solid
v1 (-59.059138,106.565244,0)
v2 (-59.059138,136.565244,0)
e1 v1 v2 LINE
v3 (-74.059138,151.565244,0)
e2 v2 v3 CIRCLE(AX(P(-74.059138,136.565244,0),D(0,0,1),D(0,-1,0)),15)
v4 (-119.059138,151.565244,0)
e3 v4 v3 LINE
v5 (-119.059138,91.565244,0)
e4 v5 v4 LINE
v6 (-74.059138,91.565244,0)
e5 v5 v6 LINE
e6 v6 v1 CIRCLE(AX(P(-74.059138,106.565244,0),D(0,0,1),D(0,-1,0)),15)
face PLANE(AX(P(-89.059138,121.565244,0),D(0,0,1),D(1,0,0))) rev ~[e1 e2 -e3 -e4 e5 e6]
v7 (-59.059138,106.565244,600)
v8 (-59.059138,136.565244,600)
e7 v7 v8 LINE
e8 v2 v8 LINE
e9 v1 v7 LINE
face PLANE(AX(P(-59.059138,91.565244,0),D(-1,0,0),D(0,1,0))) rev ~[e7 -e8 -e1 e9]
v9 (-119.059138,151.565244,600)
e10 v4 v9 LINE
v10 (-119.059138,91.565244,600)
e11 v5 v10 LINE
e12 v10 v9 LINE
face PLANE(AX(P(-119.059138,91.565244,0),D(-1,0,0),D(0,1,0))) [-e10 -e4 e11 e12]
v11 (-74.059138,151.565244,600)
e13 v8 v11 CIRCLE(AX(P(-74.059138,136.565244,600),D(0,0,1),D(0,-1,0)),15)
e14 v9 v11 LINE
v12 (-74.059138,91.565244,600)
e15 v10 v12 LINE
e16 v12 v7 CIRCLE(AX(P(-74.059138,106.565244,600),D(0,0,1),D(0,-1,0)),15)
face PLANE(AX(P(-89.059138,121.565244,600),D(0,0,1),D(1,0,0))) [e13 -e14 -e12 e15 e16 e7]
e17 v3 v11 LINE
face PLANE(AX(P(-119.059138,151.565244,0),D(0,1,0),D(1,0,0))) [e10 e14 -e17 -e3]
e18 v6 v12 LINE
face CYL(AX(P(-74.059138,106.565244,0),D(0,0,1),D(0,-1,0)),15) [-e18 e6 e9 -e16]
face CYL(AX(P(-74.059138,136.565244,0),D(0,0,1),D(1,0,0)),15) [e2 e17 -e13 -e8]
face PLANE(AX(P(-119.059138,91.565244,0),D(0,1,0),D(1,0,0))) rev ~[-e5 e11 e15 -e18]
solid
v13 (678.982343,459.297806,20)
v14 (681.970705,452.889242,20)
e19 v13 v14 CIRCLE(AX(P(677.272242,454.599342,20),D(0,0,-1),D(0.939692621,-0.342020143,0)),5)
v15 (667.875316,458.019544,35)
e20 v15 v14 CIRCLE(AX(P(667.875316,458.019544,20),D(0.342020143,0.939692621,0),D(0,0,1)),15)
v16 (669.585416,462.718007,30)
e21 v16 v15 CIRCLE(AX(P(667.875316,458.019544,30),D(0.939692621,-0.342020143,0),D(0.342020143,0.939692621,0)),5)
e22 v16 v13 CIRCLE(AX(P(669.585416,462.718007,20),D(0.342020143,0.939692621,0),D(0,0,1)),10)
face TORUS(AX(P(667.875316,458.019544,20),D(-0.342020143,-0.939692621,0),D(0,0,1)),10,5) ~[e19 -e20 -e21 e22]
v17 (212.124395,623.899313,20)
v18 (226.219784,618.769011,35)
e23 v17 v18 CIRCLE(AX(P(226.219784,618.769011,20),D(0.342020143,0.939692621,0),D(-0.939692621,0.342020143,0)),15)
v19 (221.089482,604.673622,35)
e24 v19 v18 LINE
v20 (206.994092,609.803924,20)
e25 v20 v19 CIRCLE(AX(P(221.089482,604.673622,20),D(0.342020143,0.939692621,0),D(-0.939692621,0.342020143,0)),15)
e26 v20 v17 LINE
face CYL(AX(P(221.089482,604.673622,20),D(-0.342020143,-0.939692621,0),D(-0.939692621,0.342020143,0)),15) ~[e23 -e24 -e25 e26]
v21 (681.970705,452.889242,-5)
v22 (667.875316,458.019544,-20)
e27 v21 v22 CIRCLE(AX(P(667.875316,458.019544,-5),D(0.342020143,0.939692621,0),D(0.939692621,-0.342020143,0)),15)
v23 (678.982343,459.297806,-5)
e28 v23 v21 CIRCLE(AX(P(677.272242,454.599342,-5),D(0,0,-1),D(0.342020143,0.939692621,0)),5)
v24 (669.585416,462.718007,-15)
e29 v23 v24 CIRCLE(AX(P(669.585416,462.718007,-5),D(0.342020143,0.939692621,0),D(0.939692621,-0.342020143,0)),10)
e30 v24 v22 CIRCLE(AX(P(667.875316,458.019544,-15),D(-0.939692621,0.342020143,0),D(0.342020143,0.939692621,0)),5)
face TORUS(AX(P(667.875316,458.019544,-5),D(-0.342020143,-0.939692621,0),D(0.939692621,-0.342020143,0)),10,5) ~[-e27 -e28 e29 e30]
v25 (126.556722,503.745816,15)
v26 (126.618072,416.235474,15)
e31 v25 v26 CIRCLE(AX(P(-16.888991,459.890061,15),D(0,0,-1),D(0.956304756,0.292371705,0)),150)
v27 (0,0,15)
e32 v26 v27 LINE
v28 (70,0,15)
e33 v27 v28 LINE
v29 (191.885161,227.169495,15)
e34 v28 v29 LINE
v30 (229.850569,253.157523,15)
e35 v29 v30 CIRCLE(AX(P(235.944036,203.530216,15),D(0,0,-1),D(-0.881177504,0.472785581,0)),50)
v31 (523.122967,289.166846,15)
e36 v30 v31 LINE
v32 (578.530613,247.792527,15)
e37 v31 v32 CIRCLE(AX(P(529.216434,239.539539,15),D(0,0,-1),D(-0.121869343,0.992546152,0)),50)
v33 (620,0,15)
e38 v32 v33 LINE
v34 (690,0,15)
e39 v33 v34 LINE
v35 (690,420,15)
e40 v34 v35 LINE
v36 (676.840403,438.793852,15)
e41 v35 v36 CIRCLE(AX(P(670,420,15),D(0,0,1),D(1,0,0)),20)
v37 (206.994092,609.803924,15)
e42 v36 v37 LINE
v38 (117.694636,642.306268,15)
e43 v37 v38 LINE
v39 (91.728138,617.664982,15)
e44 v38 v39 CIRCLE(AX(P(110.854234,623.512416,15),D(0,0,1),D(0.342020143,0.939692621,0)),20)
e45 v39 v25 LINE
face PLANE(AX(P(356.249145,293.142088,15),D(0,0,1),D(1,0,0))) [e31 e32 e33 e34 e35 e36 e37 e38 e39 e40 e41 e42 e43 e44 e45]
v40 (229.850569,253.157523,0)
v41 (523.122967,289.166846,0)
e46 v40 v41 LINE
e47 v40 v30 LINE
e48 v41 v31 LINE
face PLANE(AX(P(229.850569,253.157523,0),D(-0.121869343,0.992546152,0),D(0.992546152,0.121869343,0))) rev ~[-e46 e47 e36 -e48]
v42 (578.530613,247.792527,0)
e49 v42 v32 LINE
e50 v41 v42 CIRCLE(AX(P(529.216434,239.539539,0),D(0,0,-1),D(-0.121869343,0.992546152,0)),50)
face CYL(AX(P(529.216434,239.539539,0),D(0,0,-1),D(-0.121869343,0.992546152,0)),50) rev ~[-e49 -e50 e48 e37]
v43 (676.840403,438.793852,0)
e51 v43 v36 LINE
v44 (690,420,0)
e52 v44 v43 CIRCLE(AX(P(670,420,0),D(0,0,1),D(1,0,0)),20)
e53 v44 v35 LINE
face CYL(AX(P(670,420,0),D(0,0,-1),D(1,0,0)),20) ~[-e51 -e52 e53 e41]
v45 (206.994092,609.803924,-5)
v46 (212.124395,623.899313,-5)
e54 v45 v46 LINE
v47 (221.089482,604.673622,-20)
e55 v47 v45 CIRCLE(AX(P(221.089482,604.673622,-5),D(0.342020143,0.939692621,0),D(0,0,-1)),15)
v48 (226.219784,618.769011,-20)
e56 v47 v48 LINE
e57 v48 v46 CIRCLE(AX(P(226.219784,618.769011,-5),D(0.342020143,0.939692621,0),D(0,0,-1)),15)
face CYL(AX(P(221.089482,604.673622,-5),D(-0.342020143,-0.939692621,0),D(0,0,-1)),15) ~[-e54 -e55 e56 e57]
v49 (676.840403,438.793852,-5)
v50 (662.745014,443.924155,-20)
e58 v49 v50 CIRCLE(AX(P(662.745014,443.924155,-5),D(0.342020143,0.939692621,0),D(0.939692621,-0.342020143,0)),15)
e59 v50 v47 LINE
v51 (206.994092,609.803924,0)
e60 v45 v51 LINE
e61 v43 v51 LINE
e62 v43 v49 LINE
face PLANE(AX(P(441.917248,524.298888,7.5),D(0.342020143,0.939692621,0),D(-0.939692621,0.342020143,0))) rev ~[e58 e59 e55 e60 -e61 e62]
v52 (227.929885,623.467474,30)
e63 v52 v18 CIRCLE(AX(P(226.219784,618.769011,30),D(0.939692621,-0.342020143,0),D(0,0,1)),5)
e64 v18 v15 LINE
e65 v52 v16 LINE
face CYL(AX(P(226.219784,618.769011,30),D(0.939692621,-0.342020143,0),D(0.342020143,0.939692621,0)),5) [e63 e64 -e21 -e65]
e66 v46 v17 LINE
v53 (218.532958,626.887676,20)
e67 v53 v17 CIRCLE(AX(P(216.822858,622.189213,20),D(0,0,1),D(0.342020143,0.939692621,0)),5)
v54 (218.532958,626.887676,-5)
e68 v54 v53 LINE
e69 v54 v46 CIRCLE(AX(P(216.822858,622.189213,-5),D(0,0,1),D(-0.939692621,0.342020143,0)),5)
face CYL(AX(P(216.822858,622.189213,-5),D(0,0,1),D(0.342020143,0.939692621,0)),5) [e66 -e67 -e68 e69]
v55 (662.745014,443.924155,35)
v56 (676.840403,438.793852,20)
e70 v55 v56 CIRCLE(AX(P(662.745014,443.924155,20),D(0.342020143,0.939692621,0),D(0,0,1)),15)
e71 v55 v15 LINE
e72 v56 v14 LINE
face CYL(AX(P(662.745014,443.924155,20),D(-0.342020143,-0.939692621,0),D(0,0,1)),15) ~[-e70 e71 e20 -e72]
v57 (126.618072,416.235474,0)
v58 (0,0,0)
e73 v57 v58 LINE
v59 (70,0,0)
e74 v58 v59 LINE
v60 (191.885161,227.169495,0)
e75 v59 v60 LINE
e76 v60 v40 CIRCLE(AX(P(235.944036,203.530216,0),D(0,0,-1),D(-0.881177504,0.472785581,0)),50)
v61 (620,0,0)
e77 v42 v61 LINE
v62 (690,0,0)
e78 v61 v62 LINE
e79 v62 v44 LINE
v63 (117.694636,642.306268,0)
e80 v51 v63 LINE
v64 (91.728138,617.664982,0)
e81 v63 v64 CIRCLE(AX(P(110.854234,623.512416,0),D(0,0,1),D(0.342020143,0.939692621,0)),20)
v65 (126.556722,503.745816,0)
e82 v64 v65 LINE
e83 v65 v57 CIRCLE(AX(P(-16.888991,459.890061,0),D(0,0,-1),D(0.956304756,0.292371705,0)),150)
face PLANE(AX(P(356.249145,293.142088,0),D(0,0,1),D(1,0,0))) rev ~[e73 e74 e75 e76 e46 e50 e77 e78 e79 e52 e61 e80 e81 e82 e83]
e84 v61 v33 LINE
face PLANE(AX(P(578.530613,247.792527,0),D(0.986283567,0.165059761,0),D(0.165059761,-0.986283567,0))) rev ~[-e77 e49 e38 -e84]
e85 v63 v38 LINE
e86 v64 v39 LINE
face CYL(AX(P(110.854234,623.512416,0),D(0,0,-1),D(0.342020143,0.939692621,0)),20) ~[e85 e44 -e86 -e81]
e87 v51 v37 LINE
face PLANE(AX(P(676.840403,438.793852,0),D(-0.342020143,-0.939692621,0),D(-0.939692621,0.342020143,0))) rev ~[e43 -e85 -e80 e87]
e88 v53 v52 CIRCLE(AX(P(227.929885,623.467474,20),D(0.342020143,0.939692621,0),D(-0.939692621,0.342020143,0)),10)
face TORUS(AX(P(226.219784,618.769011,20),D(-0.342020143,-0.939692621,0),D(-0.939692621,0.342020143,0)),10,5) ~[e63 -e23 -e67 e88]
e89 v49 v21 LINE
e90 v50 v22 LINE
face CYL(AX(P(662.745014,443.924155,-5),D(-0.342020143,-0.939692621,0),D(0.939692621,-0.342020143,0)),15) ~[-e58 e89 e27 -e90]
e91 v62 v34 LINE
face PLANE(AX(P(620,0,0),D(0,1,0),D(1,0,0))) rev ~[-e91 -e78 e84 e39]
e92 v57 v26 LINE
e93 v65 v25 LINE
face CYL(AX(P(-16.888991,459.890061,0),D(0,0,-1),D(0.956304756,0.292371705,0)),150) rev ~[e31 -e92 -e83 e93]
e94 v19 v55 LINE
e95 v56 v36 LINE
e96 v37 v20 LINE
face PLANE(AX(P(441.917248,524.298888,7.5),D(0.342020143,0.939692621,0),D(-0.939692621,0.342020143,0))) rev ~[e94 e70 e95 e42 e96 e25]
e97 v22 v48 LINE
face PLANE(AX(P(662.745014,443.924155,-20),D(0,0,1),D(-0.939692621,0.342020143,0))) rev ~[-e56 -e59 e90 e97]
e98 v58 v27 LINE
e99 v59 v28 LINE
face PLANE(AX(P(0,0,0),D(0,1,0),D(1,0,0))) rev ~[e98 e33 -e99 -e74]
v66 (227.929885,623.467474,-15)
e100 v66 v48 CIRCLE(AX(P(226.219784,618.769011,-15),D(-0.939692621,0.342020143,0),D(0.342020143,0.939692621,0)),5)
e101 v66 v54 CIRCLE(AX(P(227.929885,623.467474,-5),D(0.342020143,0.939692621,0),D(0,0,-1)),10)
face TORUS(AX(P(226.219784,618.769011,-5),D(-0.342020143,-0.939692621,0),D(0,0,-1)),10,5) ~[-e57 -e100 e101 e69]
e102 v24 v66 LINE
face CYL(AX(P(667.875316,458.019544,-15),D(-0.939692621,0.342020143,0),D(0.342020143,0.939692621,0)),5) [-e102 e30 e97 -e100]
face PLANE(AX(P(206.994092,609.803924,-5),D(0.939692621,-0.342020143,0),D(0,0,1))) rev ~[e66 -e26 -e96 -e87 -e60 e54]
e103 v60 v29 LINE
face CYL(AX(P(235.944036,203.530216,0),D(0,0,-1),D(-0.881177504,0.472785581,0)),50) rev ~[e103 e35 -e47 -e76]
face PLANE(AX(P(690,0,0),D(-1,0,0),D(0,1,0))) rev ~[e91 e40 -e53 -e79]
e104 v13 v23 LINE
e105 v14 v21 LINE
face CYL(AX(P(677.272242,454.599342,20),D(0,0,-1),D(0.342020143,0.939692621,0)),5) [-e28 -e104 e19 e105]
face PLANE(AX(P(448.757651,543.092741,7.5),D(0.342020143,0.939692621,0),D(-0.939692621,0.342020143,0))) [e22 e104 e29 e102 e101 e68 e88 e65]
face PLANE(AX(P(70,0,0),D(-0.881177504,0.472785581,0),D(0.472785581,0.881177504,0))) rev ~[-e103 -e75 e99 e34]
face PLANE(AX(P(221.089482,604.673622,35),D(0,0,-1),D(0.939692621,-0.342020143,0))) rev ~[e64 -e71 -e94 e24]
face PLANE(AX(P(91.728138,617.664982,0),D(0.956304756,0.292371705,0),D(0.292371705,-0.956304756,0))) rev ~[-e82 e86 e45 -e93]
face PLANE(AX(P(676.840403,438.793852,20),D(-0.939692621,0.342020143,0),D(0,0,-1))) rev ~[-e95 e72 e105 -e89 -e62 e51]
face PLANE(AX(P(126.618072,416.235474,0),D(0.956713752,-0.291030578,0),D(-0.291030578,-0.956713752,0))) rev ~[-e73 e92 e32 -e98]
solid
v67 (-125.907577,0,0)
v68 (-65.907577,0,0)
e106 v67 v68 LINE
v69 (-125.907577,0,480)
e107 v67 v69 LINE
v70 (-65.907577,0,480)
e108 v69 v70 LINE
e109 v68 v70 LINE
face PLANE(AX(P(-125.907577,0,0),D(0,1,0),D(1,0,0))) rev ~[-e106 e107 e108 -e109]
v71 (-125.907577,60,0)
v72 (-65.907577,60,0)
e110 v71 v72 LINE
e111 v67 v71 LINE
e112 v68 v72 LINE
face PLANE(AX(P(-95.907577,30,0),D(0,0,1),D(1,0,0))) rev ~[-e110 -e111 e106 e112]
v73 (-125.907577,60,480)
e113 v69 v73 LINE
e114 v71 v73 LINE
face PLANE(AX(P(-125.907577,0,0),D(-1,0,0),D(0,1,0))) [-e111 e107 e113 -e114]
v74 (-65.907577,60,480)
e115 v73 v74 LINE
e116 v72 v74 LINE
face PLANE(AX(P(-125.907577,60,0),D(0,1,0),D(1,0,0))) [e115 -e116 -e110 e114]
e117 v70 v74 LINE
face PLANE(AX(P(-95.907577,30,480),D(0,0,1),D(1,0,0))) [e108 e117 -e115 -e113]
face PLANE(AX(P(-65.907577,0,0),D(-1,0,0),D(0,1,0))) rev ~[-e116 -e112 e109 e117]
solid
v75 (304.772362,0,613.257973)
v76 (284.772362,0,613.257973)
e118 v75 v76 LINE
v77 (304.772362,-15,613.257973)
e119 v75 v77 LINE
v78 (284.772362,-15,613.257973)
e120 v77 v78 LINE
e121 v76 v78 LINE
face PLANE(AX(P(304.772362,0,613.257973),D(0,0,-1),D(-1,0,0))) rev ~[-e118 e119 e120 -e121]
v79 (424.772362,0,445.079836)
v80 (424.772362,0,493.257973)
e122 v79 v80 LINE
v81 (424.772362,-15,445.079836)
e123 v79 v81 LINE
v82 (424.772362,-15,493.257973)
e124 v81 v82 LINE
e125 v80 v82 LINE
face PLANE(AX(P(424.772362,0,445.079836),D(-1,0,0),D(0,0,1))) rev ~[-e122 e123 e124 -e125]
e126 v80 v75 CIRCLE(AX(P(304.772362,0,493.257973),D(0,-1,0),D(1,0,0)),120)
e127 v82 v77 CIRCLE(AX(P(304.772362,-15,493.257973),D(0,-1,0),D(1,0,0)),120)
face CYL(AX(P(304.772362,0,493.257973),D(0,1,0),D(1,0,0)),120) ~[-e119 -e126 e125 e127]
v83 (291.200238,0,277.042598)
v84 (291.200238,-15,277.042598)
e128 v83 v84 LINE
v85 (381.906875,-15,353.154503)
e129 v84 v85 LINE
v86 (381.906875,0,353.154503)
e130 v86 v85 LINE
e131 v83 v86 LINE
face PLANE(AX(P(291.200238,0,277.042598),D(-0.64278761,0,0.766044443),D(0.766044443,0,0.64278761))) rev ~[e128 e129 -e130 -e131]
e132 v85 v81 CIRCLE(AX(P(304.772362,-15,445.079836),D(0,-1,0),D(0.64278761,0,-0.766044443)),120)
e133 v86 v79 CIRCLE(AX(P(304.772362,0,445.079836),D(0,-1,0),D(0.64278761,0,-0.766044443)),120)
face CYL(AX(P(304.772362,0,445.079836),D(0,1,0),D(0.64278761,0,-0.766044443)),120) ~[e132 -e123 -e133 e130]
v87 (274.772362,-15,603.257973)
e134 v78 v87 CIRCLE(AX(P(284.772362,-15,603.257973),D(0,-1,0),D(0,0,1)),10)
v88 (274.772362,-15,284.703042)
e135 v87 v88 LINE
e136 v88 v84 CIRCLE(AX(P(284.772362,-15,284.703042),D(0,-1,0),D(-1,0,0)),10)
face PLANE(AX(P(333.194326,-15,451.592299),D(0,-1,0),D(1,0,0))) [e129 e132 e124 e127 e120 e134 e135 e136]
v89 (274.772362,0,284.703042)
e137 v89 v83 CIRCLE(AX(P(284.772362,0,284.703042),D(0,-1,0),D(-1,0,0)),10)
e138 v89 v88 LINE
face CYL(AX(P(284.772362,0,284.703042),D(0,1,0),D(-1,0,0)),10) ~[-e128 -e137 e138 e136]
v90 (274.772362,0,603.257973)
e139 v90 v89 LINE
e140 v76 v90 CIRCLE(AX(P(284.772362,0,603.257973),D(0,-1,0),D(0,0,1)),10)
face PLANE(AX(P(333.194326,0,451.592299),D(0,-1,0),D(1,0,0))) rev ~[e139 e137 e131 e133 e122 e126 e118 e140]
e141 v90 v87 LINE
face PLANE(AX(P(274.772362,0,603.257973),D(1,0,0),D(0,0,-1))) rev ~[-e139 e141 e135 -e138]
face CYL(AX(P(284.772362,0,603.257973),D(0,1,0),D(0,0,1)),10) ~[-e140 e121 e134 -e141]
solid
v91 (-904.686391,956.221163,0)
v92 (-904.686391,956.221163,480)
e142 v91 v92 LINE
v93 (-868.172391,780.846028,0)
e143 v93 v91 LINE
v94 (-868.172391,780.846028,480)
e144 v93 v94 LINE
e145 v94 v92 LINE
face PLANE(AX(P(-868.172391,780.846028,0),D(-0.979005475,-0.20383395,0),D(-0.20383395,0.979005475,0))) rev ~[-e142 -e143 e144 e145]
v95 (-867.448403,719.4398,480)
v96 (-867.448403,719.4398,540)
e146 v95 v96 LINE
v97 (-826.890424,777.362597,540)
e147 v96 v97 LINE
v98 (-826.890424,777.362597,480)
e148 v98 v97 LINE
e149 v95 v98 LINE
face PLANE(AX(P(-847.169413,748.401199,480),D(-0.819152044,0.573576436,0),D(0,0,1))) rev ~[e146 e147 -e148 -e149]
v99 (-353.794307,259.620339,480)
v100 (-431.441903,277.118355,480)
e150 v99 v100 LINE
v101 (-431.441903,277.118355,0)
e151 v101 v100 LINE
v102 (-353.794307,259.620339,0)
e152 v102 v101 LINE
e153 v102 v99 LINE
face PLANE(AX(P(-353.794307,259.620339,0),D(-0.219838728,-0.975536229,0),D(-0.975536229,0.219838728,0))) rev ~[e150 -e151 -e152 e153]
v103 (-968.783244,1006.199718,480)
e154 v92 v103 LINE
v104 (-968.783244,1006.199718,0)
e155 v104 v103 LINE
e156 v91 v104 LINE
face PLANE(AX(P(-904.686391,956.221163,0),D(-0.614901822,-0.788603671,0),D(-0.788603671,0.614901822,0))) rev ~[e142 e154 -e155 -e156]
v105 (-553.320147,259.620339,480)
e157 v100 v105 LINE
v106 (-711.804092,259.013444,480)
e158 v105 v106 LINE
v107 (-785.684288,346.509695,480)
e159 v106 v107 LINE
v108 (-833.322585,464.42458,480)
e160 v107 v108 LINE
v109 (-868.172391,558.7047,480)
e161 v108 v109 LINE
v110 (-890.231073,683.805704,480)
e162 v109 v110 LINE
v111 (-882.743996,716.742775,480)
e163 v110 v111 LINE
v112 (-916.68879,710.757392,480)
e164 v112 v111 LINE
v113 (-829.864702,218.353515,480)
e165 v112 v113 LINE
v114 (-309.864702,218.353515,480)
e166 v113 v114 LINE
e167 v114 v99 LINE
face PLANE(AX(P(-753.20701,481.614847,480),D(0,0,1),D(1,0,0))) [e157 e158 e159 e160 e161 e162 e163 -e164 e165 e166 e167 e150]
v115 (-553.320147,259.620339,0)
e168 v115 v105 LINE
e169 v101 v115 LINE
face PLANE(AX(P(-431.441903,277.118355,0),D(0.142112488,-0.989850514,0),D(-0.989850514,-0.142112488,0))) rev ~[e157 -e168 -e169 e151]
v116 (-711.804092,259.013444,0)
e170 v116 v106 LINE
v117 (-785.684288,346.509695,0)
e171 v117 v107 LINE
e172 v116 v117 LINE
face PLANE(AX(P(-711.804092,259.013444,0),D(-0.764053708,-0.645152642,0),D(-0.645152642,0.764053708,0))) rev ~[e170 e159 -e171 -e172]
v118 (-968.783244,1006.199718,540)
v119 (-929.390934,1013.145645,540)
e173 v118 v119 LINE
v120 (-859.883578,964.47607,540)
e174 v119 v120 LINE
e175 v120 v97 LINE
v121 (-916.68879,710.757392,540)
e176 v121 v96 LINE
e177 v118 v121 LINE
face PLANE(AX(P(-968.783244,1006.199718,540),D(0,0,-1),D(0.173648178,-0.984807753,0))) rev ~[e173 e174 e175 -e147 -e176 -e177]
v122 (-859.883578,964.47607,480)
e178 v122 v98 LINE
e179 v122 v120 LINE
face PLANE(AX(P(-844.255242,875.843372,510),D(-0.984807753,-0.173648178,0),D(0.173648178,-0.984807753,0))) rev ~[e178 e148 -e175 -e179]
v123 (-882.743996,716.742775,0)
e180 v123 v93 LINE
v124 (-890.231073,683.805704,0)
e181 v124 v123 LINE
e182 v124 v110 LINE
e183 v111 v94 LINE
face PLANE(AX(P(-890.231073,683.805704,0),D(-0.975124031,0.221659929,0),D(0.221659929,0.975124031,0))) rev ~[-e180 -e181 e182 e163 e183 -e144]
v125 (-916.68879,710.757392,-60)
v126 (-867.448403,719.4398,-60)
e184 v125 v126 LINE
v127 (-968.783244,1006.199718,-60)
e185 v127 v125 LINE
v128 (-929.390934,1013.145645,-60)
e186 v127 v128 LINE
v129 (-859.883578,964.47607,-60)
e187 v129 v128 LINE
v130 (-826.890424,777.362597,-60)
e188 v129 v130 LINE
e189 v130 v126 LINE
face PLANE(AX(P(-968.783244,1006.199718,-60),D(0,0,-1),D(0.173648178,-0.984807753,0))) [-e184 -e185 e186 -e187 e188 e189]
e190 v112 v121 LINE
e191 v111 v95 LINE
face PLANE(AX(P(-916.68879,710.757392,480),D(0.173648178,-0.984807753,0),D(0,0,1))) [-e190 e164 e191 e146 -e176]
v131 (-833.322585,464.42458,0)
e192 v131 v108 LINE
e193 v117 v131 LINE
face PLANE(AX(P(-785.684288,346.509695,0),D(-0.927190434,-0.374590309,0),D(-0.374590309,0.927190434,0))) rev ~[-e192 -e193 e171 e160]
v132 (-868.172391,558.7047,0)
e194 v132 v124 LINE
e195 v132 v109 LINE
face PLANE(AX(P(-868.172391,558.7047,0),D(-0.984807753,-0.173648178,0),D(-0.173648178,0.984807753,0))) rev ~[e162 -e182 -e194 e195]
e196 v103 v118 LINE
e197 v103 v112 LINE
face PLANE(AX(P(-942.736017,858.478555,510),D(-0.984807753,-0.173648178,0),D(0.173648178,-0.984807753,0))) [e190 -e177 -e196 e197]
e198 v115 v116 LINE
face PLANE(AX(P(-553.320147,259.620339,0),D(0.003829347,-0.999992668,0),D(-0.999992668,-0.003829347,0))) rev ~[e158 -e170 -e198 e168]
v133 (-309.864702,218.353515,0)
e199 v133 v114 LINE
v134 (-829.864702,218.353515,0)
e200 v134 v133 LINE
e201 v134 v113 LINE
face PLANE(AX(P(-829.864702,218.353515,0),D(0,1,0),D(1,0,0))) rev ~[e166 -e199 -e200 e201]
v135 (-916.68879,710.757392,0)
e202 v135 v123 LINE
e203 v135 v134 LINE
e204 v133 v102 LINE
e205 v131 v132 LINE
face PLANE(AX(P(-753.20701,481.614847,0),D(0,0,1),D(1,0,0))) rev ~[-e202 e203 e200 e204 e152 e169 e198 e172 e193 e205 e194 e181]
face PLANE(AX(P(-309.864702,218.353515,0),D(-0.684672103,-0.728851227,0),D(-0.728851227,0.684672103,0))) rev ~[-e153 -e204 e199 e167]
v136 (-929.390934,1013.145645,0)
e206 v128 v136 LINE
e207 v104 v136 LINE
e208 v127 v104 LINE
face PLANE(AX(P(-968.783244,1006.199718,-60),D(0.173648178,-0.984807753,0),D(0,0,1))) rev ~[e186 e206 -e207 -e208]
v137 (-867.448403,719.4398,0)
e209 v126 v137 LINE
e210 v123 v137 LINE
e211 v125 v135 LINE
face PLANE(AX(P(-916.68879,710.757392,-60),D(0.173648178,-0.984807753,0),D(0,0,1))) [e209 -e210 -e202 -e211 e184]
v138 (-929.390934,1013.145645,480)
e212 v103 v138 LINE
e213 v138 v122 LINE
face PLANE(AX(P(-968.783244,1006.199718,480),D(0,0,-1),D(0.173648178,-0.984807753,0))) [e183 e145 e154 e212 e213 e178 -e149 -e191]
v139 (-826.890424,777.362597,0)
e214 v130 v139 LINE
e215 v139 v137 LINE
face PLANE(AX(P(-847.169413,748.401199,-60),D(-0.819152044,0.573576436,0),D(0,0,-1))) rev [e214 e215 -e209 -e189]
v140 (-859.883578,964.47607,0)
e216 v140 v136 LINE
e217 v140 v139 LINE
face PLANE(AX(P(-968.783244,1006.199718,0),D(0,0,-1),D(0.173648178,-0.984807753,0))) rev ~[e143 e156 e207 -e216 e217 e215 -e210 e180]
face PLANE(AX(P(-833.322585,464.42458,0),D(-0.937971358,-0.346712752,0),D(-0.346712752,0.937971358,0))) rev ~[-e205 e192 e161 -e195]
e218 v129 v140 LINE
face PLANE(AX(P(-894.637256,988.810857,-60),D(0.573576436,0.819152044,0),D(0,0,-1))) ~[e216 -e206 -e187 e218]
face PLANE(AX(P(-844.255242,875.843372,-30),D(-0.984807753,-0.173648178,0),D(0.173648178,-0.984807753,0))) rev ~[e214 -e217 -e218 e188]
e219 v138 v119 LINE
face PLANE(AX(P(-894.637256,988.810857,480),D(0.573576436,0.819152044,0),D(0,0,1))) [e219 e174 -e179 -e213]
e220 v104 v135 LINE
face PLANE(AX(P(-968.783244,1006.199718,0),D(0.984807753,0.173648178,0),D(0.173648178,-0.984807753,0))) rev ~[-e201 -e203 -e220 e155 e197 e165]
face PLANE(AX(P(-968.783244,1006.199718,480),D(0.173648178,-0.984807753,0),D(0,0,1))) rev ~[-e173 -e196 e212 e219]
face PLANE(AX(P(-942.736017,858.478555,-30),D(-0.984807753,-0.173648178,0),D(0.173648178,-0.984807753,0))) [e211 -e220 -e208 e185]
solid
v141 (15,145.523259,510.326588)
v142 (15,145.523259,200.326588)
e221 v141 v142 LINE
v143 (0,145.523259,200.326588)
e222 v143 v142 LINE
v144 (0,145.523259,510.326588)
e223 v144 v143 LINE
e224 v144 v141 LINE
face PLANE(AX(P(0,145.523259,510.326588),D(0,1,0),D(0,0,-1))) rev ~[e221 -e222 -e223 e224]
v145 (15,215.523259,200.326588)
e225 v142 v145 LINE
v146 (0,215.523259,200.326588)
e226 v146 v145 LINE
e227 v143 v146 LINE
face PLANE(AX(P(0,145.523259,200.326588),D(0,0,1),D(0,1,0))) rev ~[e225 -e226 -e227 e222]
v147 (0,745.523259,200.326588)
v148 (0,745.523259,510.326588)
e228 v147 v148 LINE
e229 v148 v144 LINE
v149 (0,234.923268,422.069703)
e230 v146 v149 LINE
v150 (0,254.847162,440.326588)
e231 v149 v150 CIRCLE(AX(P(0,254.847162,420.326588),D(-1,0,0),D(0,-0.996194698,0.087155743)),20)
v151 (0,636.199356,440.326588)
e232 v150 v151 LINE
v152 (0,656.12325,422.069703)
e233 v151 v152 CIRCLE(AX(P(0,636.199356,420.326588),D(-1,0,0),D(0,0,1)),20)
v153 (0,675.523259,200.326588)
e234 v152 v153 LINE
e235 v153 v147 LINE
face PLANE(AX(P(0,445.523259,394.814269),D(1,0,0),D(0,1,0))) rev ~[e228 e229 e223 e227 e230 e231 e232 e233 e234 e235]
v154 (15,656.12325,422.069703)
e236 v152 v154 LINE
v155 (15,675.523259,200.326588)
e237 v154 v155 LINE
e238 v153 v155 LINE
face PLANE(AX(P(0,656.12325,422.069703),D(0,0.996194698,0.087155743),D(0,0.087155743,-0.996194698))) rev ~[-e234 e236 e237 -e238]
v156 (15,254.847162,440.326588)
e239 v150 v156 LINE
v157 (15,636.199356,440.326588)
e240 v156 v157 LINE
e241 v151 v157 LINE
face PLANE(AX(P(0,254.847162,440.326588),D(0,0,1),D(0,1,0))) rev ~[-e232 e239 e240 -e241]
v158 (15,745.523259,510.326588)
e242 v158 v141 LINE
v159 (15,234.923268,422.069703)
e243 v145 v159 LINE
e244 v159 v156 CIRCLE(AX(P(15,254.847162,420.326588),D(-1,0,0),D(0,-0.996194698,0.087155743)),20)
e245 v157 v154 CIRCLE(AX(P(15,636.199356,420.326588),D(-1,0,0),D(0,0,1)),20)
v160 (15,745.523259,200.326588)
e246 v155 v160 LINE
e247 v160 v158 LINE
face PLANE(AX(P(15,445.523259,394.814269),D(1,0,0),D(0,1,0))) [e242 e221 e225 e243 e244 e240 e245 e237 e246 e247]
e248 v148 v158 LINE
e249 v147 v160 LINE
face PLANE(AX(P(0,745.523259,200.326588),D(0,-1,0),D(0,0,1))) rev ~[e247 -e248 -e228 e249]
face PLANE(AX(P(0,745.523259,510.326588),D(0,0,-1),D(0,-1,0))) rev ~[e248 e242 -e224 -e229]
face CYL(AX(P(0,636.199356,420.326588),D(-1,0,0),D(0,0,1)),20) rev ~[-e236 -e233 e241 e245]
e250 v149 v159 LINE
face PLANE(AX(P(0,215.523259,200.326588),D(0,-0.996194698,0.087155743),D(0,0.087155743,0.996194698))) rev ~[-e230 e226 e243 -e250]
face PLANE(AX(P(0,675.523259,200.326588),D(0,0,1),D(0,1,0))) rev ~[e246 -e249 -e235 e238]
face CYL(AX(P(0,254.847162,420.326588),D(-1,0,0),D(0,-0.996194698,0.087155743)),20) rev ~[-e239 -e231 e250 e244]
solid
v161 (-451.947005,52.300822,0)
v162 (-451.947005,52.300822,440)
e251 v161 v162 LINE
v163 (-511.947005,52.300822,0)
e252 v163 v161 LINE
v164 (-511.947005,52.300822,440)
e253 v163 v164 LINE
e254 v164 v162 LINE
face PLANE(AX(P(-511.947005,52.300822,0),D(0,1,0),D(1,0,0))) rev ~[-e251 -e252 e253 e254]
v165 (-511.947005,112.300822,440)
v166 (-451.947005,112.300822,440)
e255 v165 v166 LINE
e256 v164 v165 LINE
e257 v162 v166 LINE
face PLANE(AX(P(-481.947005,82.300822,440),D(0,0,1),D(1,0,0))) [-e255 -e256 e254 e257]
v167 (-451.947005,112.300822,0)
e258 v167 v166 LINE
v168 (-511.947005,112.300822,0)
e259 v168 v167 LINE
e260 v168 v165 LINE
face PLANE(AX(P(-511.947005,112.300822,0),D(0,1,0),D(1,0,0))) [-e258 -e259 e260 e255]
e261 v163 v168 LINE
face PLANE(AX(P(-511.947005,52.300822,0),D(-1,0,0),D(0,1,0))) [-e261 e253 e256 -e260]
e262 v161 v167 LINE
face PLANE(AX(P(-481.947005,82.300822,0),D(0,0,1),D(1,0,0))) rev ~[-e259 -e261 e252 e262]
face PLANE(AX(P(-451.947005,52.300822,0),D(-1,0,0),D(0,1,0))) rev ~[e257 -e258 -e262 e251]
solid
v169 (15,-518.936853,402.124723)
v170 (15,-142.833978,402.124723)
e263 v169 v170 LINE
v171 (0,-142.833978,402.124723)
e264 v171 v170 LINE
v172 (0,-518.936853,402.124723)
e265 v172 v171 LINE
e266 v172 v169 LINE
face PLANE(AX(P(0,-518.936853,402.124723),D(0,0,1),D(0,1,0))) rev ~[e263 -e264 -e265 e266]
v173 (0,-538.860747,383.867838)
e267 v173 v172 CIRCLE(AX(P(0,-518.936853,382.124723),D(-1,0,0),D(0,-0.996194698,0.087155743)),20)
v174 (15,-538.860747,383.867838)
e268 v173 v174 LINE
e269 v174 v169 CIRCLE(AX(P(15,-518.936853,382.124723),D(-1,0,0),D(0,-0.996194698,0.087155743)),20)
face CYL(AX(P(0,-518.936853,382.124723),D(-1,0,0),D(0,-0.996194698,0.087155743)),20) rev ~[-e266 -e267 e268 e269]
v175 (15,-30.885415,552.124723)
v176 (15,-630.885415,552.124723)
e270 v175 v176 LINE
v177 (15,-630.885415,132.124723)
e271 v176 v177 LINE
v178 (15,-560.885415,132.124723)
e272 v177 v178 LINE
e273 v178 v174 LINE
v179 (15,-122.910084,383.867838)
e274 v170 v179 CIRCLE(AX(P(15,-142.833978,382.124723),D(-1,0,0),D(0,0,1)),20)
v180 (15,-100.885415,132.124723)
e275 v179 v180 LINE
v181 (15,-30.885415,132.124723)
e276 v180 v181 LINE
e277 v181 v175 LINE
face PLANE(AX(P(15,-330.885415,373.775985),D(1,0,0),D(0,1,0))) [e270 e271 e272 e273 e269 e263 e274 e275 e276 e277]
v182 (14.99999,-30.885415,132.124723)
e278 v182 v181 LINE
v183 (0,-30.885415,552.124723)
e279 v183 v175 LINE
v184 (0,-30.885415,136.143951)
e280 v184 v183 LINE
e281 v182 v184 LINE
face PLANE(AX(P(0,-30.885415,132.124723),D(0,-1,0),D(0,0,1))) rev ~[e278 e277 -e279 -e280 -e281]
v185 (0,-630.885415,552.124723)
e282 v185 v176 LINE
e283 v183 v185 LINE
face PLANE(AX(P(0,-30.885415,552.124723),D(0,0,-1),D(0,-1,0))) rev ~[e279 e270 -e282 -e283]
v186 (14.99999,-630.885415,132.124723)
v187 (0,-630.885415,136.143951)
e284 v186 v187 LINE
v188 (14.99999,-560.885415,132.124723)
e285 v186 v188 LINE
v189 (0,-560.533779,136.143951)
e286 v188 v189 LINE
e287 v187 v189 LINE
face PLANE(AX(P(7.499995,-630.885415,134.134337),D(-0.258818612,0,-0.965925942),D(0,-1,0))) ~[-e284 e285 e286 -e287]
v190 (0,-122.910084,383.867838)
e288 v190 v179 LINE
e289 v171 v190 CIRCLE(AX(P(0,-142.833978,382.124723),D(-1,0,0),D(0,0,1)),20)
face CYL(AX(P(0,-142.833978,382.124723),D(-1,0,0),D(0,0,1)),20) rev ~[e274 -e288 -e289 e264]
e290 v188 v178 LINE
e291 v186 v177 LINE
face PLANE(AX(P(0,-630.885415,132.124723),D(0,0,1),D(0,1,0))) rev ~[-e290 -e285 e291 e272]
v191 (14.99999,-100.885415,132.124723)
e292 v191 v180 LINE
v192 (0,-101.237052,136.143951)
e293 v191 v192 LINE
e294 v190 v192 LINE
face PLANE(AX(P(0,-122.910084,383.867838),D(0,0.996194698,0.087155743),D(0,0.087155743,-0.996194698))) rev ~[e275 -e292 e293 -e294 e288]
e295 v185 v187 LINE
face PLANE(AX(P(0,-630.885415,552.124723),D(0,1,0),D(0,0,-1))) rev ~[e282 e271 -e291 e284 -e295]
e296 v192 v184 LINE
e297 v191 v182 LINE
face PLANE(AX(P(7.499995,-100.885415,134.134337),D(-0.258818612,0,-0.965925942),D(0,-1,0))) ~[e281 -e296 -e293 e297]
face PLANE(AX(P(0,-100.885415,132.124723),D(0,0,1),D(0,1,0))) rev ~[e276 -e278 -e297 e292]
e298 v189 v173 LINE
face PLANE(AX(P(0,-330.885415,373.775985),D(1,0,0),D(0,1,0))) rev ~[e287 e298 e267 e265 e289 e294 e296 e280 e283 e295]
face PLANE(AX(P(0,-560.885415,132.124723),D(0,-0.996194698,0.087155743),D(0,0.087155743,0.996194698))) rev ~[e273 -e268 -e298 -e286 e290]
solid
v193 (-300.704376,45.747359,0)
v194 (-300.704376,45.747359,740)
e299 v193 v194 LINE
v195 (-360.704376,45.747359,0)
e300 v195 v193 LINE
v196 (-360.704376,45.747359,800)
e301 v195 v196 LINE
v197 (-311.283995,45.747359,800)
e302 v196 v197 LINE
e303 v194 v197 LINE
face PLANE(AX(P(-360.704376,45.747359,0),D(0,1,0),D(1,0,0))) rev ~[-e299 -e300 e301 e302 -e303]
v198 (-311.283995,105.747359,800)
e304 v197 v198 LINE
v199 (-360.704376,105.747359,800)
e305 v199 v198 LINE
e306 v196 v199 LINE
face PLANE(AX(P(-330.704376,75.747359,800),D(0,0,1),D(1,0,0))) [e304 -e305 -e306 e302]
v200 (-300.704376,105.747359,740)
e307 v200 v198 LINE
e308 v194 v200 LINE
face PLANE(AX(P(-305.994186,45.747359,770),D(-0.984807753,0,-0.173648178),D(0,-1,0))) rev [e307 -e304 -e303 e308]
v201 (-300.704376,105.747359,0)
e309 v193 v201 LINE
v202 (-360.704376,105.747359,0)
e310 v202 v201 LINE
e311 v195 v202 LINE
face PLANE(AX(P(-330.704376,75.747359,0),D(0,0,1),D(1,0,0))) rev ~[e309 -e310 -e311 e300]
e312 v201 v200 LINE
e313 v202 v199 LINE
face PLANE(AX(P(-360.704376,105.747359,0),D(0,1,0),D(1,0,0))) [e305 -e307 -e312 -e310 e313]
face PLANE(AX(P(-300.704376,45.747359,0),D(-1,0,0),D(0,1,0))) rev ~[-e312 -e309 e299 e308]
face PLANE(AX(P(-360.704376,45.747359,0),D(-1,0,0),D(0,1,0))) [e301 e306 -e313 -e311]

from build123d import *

# Parameters (mm, degrees)
F1_DEPTH    = 15
F3_DEPTH    = 20
F4_R        = 5
F6_DEPTH    = 600
F7_R        = 50
F9_DEPTH    = 300
F10_R       = 10
F12_DEPTH   = 15
F13_SIZE2   = 4.019228
F13_SIZE    = 14.99999
F13_2_SIZE2 = 4.019228
F13_2_SIZE  = 14.99999
F15_W       = 60
F15_H       = 60
F16_DEPTH   = 440
F17_W       = 60
F17_H       = 60
F18_DEPTH   = 800
F19_SIZE2   = 10.5796188425
F19_SIZE    = 60
F20_W       = 60
F20_H       = 60
F21_DEPTH   = 600
F23_DEPTH   = 15
F24_R       = 15
F25_W       = 60
F25_H       = 60
F26_DEPTH   = 480
F28_DEPTH   = 480
F29_W       = 300
F29_H       = 60
F30_DEPTH   = 100
F31_SIZE    = 50
F32_SIZE    = 60


# Not quite as in the source:
# - a fillet or chamfer is up to 0.001 mm smaller than in the source, because OpenCascade refuses the exact size


with BuildPart() as f1:
    # F0 (on Top) → F1 (new body)
    with BuildSketch(Plane.XY):
        with BuildLine():
            Line((126.6180717201, 416.2354741443), (0, 0))
            Line((0, 0), (70, 0))
            Line((70, 0), (191.8851607508, 227.1694949665))
            ThreePointArc((191.8851607508, 227.1694949665), (207.7011825649, 244.7896539907), (229.8505687934, 253.1575234781))
            Line((229.8505687934, 253.1575234781), (523.1229672837, 289.1668461516))
            ThreePointArc((523.1229672837, 289.1668461516), (559.1324176201, 279.6024135438), (578.5306128266, 247.7925266))
            Line((578.5306128266, 247.7925266), (620, 0))
            Line((620, 0), (690, 0))
            Line((690, 0), (690, 420))
            ThreePointArc((690, 420), (686.3830408858, 431.471528727), (676.8404028665, 438.7938524157))
            Line((676.8404028665, 438.7938524157), (117.6946363687, 642.3062680369))
            ThreePointArc((117.6946363687, 642.3062680369), (97.0871419884, 638.0199030414), (91.728138383, 617.6649815267))
            Line((91.728138383, 617.6649815267), (126.5567223416, 503.7458164876))
            ThreePointArc((126.5567223416, 503.7458164876), (133.1109720865, 459.9952186871), (126.6180717201, 416.2354741443))
        make_face()
    extrude(amount=F1_DEPTH)

    # F2 (on face) → F3 (join)
    with BuildSketch(Plane(origin=(220.2009124558, 604.9970347157, 0), x_dir=(-0.9396926208, 0.3420201433, 0), z_dir=(0.3420201433, 0.9396926208, 0))):
        with BuildLine():
            Line((-0.9455957298, 35), (-470.9455957298, 35))
            ThreePointArc((-470.9455957298, 35), (-481.5521974476, 30.6066017178), (-485.9455957298, 20))
            Line((-485.9455957298, 20), (-485.9455957298, -5))
            ThreePointArc((-485.9455957298, -5), (-481.5521974476, -15.6066017178), (-470.9455957298, -20))
            Line((-470.9455957298, -20), (-0.9455957298, -20))
            ThreePointArc((-0.9455957298, -20), (9.661005988, -15.6066017178), (14.0544042702, -5))
            Line((14.0544042702, -5), (14.0544042702, 20))
            ThreePointArc((14.0544042702, 20), (9.661005988, 30.6066017178), (-0.9455957298, 35))
        make_face()
    extrude(amount=F3_DEPTH)

    # F4
    f4_edges = [f1.edges().sort_by_distance(p)[0] for p in [
        (448.757651, 543.092741, -20),
    ]]
    fillet(f4_edges, radius=F4_R)


with BuildPart() as f6:
    # F5 (on Front) → F6 (new body)
    with BuildSketch(Plane.XZ):
        with BuildLine():
            Line((-123.4288864959, -313.8082504272), (0, -1013.8082504272))
            Line((0, -1013.8082504272), (626.6764420045, -1013.8082504272))
            ThreePointArc((626.6764420045, -1013.8082504272), (645.8275530824, -1004.8779406694), (651.2966358298, -984.4670459856))
            Line((651.2966358298, -984.4670459856), (640.3123613054, -922.1721295738))
            ThreePointArc((640.3123613054, -922.1721295738), (604.7540774342, -861.8146206111), (538.3170815047, -839.5987251324))
            Line((538.3170815047, -839.5987251324), (134.2559409884, -853.8082504272))
            Line((134.2559409884, -853.8082504272), (39.0393714058, -313.8082504272))
            Line((39.0393714058, -313.8082504272), (39.0393714058, -13.8082504272))
            Line((39.0393714058, -13.8082504272), (-123.4288864959, -13.8082504272))
            Line((-123.4288864959, -13.8082504272), (-123.4288864959, -313.8082504272))
        make_face()
    extrude(amount=F6_DEPTH)

    # F7
    f7_edges = [f6.edges().sort_by_distance(p)[0] for p in [
        (0, -300, -1013.80825),
    ]]
    fillet(f7_edges, radius=F7_R)

    # F8 (on face) → F9 (join)
    with BuildSketch(Plane.XY.offset(-13.8082504272)):
        Polygon((-123.4288864959, 0), (39.0393714058, 0), (175.9928613901, 89.3815875053), (66.5727051852, 89.3815875053), align=None)
        Polygon((175.9928613901, -689.3815875053), (39.0393714058, -600), (-123.4288864959, -600), (66.5727051852, -689.3815875053), align=None)
    extrude(amount=-F9_DEPTH)

    # F10 (call 1 of 8: OpenCascade refuses the feature's edges together)
    f10_edges = [f6.edges().sort_by_distance(p)[0] for p in [
        (175.992861, -689.381588, -163.80825),
    ]]
    fillet(f10_edges, radius=F10_R)

    # F10#2 (call 2 of 8)
    f10_2_edges = [f6.edges().sort_by_distance(p)[0] for p in [
        (175.992861, 89.381588, -163.80825),
    ]]
    fillet(f10_2_edges, radius=F10_R)

    # F10#3 (call 3 of 8)
    f10_3_edges = [f6.edges().sort_by_distance(p)[0] for p in [
        (66.572705, -689.381588, -163.80825),
    ]]
    fillet(f10_3_edges, radius=F10_R)

    # F10#4 (call 4 of 8)
    f10_4_edges = [f6.edges().sort_by_distance(p)[0] for p in [
        (-123.428886, -600, -163.80825),
    ]]
    fillet(f10_4_edges, radius=F10_R)

    # F10#5 (call 5 of 8)
    f10_5_edges = [f6.edges().sort_by_distance(p)[0] for p in [
        (66.572705, 89.381588, -163.80825),
    ]]
    fillet(f10_5_edges, radius=F10_R)

    # F10#6 (call 6 of 8)
    f10_6_edges = [f6.edges().sort_by_distance(p)[0] for p in [
        (-123.428886, 0, -163.80825),
    ]]
    fillet(f10_6_edges, radius=F10_R)

    # F10#7 (call 7 of 8)
    f10_7_edges = [f6.edges().sort_by_distance(p)[0] for p in [
        (39.039371, -600, -163.80825),
    ]]
    fillet(f10_7_edges, radius=F10_R)

    # F10#8 (call 8 of 8)
    f10_8_edges = [f6.edges().sort_by_distance(p)[0] for p in [
        (39.039371, 0, -163.80825),
    ]]
    fillet(f10_8_edges, radius=F10_R)


with BuildPart() as f12:
    # F11 (on Right) → F12 (new body)
    with BuildSketch(Plane.YZ):
        with BuildLine():
            Line((-30.8854154888, 552.1247227984), (-630.8854154888, 552.1247227984))
            Line((-630.8854154888, 552.1247227984), (-630.8854154888, 132.1247227984))
            Line((-630.8854154888, 132.1247227984), (-560.8854154888, 132.1247227984))
            Line((-560.8854154888, 132.1247227984), (-538.8607468183, 383.8678376533))
            ThreePointArc((-538.8607468183, 383.8678376533), (-532.4486570087, 396.8702695346), (-518.9368528564, 402.1247227984))
            Line((-518.9368528564, 402.1247227984), (-142.8339781211, 402.1247227984))
            ThreePointArc((-142.8339781211, 402.1247227984), (-129.3221739688, 396.8702695346), (-122.9100841593, 383.8678376533))
            Line((-122.9100841593, 383.8678376533), (-100.8854154888, 132.1247227984))
            Line((-100.8854154888, 132.1247227984), (-30.8854154888, 132.1247227984))
            Line((-30.8854154888, 132.1247227984), (-30.8854154888, 552.1247227984))
        make_face()
    extrude(amount=F12_DEPTH)

    # F13 (size 15 and 4.0192378865 in the source; OpenCascade refuses exactly that, so slightly less here)
    f13_edges = [f12.edges().sort_by_distance(p)[0] for p in [
        (0, -595.885415, 132.124723),
    ]]
    f13_side = f12.faces().sort_by_distance((7.5, -595.885415, 132.124723))[0]
    chamfer(f13_edges, length=F13_SIZE, length2=F13_SIZE2, reference=f13_side)

    # F13#2 (size 15 and 4.0192378865 in the source; OpenCascade refuses exactly that, so slightly less here)
    f13_2_edges = [f12.edges().sort_by_distance(p)[0] for p in [
        (0, -65.885415, 132.124723),
    ]]
    f13_2_side = f12.faces().sort_by_distance((7.5, -65.885415, 132.124723))[0]
    chamfer(f13_2_edges, length=F13_2_SIZE, length2=F13_2_SIZE2, reference=f13_2_side)


with BuildPart() as f12b:
    # F11 (on Right) → F12, piece 2 (new body)
    with BuildSketch(Plane.YZ):
        with BuildLine():
            Line((745.5232589184, 510.3265881046), (145.5232589184, 510.3265881046))
            Line((145.5232589184, 510.3265881046), (145.5232589184, 200.3265881046))
            Line((145.5232589184, 200.3265881046), (215.5232589184, 200.3265881046))
            Line((215.5232589184, 200.3265881046), (234.9232676831, 422.0697029596))
            ThreePointArc((234.9232676831, 422.0697029596), (241.3353574927, 435.0721348408), (254.847161645, 440.3265881046))
            Line((254.847161645, 440.3265881046), (636.1993561918, 440.3265881046))
            ThreePointArc((636.1993561918, 440.3265881046), (649.7111603441, 435.0721348408), (656.1232501537, 422.0697029596))
            Line((656.1232501537, 422.0697029596), (675.5232589184, 200.3265881046))
            Line((675.5232589184, 200.3265881046), (745.5232589184, 200.3265881046))
            Line((745.5232589184, 200.3265881046), (745.5232589184, 510.3265881046))
        make_face()
    extrude(amount=F12_DEPTH)


with BuildPart() as f16:
    # F15 (on Top) → F16 (new body)
    with BuildSketch(Plane.XY):
        with Locations((-481.9470045646, 82.3008220813)):
            Rectangle(F15_W, F15_H)
    extrude(amount=F16_DEPTH)


with BuildPart() as f18:
    # F17 (on Top) → F18 (new body)
    with BuildSketch(Plane.XY):
        with Locations((-330.7043761015, 75.7473593429)):
            Rectangle(F17_W, F17_H)
    extrude(amount=F18_DEPTH)

    # F19
    f19_edges = [f18.edges().sort_by_distance(p)[0] for p in [
        (-300.704376, 75.747359, 800),
    ]]
    f19_side = f18.faces().sort_by_distance((-300.704376, 75.747359, 400))[0]
    chamfer(f19_edges, length=F19_SIZE, length2=F19_SIZE2, reference=f19_side)


with BuildPart() as f21:
    # F20 (on Top) → F21 (new body)
    with BuildSketch(Plane.XY):
        with Locations((-89.059138, 121.5652438998)):
            Rectangle(F20_W, F20_H)
    extrude(amount=F21_DEPTH)

    # F24
    f24_edges = [f21.edges().sort_by_distance(p)[0] for p in [
        (-59.059138, 151.565244, 300),
        (-59.059138, 91.565244, 300),
    ]]
    fillet(f24_edges, radius=F24_R)


with BuildPart() as f23:
    # F22 (on Front) → F23 (new body)
    with BuildSketch(Plane.XZ):
        with BuildLine():
            Line((304.7723621194, 613.257972736), (284.7723621194, 613.257972736))
            ThreePointArc((284.7723621194, 613.257972736), (277.7012943075, 610.3290405479), (274.7723621194, 603.257972736))
            Line((274.7723621194, 603.257972736), (274.7723621194, 284.7030419411))
            ThreePointArc((274.7723621194, 284.7030419411), (280.546179502, 275.6399640708), (291.2002382162, 277.0425975099))
            Line((291.2002382162, 277.0425975099), (381.9068752817, 353.154503217))
            ThreePointArc((381.9068752817, 353.154503217), (413.5292965638, 394.3656449823), (424.7723621194, 445.0798363912))
            Line((424.7723621194, 445.0798363912), (424.7723621194, 493.257972736))
            ThreePointArc((424.7723621194, 493.257972736), (389.6251758617, 578.1107864784), (304.7723621194, 613.257972736))
        make_face()
    extrude(amount=F23_DEPTH)


with BuildPart() as f26:
    # F25 (on Top) → F26 (new body)
    with BuildSketch(Plane.XY):
        with Locations((-95.9075767291, 30)):
            Rectangle(F25_W, F25_H)
    extrude(amount=F26_DEPTH)


with BuildPart() as f28:
    # F27 (on Top) → F28 (new body)
    with BuildSketch(Plane.XY):
        Polygon((-829.8647016287, 218.3535151119), (-309.8647016287, 218.3535151119), (-353.7943065166, 259.6203386784), (-431.4419031143, 277.1183550358), (-553.3201474993, 259.6203386784), (-711.8040919304, 259.0134441853), (-785.6842875481, 346.5096950531), (-833.3225846291, 464.4245803356), (-868.1723905917, 558.7047001621), (-890.2310729027, 683.8057041168), (-868.1723905917, 780.8460277596), (-904.6863913536, 956.2211632729), (-968.7832437622, 1006.1997175217), align=None)
    extrude(amount=F28_DEPTH)

    # F29 (on face) → F30 (join)
    with BuildSketch(Plane(origin=(-767.5005687328, -135.3310579767, 0), x_dir=(0.1736481777, -0.984807753, 0), z_dir=(-0.984807753, -0.1736481777, 0))):
        with Locations((-1009.1407277276, -30)):
            Rectangle(F29_W, F29_H)
        with Locations((-1009.1407277276, 510)):
            Rectangle(F29_W, F29_H)
    extrude(amount=-F30_DEPTH)

    # F31
    f31_edges = [f28.edges().sort_by_distance(p)[0] for p in [
        (-818.208015, 728.122209, 510),
        (-818.208015, 728.122209, -30),
    ]]
    chamfer(f31_edges, length=F31_SIZE)

    # F32
    f32_edges = [f28.edges().sort_by_distance(p)[0] for p in [
        (-870.302468, 1023.564535, 510),
        (-870.302468, 1023.564535, -30),
    ]]
    chamfer(f32_edges, length=F32_SIZE)


solid = Compound([f1.part, f12.part, f12b.part, f16.part, f18.part, f21.part, f23.part, f26.part, f28.part])
